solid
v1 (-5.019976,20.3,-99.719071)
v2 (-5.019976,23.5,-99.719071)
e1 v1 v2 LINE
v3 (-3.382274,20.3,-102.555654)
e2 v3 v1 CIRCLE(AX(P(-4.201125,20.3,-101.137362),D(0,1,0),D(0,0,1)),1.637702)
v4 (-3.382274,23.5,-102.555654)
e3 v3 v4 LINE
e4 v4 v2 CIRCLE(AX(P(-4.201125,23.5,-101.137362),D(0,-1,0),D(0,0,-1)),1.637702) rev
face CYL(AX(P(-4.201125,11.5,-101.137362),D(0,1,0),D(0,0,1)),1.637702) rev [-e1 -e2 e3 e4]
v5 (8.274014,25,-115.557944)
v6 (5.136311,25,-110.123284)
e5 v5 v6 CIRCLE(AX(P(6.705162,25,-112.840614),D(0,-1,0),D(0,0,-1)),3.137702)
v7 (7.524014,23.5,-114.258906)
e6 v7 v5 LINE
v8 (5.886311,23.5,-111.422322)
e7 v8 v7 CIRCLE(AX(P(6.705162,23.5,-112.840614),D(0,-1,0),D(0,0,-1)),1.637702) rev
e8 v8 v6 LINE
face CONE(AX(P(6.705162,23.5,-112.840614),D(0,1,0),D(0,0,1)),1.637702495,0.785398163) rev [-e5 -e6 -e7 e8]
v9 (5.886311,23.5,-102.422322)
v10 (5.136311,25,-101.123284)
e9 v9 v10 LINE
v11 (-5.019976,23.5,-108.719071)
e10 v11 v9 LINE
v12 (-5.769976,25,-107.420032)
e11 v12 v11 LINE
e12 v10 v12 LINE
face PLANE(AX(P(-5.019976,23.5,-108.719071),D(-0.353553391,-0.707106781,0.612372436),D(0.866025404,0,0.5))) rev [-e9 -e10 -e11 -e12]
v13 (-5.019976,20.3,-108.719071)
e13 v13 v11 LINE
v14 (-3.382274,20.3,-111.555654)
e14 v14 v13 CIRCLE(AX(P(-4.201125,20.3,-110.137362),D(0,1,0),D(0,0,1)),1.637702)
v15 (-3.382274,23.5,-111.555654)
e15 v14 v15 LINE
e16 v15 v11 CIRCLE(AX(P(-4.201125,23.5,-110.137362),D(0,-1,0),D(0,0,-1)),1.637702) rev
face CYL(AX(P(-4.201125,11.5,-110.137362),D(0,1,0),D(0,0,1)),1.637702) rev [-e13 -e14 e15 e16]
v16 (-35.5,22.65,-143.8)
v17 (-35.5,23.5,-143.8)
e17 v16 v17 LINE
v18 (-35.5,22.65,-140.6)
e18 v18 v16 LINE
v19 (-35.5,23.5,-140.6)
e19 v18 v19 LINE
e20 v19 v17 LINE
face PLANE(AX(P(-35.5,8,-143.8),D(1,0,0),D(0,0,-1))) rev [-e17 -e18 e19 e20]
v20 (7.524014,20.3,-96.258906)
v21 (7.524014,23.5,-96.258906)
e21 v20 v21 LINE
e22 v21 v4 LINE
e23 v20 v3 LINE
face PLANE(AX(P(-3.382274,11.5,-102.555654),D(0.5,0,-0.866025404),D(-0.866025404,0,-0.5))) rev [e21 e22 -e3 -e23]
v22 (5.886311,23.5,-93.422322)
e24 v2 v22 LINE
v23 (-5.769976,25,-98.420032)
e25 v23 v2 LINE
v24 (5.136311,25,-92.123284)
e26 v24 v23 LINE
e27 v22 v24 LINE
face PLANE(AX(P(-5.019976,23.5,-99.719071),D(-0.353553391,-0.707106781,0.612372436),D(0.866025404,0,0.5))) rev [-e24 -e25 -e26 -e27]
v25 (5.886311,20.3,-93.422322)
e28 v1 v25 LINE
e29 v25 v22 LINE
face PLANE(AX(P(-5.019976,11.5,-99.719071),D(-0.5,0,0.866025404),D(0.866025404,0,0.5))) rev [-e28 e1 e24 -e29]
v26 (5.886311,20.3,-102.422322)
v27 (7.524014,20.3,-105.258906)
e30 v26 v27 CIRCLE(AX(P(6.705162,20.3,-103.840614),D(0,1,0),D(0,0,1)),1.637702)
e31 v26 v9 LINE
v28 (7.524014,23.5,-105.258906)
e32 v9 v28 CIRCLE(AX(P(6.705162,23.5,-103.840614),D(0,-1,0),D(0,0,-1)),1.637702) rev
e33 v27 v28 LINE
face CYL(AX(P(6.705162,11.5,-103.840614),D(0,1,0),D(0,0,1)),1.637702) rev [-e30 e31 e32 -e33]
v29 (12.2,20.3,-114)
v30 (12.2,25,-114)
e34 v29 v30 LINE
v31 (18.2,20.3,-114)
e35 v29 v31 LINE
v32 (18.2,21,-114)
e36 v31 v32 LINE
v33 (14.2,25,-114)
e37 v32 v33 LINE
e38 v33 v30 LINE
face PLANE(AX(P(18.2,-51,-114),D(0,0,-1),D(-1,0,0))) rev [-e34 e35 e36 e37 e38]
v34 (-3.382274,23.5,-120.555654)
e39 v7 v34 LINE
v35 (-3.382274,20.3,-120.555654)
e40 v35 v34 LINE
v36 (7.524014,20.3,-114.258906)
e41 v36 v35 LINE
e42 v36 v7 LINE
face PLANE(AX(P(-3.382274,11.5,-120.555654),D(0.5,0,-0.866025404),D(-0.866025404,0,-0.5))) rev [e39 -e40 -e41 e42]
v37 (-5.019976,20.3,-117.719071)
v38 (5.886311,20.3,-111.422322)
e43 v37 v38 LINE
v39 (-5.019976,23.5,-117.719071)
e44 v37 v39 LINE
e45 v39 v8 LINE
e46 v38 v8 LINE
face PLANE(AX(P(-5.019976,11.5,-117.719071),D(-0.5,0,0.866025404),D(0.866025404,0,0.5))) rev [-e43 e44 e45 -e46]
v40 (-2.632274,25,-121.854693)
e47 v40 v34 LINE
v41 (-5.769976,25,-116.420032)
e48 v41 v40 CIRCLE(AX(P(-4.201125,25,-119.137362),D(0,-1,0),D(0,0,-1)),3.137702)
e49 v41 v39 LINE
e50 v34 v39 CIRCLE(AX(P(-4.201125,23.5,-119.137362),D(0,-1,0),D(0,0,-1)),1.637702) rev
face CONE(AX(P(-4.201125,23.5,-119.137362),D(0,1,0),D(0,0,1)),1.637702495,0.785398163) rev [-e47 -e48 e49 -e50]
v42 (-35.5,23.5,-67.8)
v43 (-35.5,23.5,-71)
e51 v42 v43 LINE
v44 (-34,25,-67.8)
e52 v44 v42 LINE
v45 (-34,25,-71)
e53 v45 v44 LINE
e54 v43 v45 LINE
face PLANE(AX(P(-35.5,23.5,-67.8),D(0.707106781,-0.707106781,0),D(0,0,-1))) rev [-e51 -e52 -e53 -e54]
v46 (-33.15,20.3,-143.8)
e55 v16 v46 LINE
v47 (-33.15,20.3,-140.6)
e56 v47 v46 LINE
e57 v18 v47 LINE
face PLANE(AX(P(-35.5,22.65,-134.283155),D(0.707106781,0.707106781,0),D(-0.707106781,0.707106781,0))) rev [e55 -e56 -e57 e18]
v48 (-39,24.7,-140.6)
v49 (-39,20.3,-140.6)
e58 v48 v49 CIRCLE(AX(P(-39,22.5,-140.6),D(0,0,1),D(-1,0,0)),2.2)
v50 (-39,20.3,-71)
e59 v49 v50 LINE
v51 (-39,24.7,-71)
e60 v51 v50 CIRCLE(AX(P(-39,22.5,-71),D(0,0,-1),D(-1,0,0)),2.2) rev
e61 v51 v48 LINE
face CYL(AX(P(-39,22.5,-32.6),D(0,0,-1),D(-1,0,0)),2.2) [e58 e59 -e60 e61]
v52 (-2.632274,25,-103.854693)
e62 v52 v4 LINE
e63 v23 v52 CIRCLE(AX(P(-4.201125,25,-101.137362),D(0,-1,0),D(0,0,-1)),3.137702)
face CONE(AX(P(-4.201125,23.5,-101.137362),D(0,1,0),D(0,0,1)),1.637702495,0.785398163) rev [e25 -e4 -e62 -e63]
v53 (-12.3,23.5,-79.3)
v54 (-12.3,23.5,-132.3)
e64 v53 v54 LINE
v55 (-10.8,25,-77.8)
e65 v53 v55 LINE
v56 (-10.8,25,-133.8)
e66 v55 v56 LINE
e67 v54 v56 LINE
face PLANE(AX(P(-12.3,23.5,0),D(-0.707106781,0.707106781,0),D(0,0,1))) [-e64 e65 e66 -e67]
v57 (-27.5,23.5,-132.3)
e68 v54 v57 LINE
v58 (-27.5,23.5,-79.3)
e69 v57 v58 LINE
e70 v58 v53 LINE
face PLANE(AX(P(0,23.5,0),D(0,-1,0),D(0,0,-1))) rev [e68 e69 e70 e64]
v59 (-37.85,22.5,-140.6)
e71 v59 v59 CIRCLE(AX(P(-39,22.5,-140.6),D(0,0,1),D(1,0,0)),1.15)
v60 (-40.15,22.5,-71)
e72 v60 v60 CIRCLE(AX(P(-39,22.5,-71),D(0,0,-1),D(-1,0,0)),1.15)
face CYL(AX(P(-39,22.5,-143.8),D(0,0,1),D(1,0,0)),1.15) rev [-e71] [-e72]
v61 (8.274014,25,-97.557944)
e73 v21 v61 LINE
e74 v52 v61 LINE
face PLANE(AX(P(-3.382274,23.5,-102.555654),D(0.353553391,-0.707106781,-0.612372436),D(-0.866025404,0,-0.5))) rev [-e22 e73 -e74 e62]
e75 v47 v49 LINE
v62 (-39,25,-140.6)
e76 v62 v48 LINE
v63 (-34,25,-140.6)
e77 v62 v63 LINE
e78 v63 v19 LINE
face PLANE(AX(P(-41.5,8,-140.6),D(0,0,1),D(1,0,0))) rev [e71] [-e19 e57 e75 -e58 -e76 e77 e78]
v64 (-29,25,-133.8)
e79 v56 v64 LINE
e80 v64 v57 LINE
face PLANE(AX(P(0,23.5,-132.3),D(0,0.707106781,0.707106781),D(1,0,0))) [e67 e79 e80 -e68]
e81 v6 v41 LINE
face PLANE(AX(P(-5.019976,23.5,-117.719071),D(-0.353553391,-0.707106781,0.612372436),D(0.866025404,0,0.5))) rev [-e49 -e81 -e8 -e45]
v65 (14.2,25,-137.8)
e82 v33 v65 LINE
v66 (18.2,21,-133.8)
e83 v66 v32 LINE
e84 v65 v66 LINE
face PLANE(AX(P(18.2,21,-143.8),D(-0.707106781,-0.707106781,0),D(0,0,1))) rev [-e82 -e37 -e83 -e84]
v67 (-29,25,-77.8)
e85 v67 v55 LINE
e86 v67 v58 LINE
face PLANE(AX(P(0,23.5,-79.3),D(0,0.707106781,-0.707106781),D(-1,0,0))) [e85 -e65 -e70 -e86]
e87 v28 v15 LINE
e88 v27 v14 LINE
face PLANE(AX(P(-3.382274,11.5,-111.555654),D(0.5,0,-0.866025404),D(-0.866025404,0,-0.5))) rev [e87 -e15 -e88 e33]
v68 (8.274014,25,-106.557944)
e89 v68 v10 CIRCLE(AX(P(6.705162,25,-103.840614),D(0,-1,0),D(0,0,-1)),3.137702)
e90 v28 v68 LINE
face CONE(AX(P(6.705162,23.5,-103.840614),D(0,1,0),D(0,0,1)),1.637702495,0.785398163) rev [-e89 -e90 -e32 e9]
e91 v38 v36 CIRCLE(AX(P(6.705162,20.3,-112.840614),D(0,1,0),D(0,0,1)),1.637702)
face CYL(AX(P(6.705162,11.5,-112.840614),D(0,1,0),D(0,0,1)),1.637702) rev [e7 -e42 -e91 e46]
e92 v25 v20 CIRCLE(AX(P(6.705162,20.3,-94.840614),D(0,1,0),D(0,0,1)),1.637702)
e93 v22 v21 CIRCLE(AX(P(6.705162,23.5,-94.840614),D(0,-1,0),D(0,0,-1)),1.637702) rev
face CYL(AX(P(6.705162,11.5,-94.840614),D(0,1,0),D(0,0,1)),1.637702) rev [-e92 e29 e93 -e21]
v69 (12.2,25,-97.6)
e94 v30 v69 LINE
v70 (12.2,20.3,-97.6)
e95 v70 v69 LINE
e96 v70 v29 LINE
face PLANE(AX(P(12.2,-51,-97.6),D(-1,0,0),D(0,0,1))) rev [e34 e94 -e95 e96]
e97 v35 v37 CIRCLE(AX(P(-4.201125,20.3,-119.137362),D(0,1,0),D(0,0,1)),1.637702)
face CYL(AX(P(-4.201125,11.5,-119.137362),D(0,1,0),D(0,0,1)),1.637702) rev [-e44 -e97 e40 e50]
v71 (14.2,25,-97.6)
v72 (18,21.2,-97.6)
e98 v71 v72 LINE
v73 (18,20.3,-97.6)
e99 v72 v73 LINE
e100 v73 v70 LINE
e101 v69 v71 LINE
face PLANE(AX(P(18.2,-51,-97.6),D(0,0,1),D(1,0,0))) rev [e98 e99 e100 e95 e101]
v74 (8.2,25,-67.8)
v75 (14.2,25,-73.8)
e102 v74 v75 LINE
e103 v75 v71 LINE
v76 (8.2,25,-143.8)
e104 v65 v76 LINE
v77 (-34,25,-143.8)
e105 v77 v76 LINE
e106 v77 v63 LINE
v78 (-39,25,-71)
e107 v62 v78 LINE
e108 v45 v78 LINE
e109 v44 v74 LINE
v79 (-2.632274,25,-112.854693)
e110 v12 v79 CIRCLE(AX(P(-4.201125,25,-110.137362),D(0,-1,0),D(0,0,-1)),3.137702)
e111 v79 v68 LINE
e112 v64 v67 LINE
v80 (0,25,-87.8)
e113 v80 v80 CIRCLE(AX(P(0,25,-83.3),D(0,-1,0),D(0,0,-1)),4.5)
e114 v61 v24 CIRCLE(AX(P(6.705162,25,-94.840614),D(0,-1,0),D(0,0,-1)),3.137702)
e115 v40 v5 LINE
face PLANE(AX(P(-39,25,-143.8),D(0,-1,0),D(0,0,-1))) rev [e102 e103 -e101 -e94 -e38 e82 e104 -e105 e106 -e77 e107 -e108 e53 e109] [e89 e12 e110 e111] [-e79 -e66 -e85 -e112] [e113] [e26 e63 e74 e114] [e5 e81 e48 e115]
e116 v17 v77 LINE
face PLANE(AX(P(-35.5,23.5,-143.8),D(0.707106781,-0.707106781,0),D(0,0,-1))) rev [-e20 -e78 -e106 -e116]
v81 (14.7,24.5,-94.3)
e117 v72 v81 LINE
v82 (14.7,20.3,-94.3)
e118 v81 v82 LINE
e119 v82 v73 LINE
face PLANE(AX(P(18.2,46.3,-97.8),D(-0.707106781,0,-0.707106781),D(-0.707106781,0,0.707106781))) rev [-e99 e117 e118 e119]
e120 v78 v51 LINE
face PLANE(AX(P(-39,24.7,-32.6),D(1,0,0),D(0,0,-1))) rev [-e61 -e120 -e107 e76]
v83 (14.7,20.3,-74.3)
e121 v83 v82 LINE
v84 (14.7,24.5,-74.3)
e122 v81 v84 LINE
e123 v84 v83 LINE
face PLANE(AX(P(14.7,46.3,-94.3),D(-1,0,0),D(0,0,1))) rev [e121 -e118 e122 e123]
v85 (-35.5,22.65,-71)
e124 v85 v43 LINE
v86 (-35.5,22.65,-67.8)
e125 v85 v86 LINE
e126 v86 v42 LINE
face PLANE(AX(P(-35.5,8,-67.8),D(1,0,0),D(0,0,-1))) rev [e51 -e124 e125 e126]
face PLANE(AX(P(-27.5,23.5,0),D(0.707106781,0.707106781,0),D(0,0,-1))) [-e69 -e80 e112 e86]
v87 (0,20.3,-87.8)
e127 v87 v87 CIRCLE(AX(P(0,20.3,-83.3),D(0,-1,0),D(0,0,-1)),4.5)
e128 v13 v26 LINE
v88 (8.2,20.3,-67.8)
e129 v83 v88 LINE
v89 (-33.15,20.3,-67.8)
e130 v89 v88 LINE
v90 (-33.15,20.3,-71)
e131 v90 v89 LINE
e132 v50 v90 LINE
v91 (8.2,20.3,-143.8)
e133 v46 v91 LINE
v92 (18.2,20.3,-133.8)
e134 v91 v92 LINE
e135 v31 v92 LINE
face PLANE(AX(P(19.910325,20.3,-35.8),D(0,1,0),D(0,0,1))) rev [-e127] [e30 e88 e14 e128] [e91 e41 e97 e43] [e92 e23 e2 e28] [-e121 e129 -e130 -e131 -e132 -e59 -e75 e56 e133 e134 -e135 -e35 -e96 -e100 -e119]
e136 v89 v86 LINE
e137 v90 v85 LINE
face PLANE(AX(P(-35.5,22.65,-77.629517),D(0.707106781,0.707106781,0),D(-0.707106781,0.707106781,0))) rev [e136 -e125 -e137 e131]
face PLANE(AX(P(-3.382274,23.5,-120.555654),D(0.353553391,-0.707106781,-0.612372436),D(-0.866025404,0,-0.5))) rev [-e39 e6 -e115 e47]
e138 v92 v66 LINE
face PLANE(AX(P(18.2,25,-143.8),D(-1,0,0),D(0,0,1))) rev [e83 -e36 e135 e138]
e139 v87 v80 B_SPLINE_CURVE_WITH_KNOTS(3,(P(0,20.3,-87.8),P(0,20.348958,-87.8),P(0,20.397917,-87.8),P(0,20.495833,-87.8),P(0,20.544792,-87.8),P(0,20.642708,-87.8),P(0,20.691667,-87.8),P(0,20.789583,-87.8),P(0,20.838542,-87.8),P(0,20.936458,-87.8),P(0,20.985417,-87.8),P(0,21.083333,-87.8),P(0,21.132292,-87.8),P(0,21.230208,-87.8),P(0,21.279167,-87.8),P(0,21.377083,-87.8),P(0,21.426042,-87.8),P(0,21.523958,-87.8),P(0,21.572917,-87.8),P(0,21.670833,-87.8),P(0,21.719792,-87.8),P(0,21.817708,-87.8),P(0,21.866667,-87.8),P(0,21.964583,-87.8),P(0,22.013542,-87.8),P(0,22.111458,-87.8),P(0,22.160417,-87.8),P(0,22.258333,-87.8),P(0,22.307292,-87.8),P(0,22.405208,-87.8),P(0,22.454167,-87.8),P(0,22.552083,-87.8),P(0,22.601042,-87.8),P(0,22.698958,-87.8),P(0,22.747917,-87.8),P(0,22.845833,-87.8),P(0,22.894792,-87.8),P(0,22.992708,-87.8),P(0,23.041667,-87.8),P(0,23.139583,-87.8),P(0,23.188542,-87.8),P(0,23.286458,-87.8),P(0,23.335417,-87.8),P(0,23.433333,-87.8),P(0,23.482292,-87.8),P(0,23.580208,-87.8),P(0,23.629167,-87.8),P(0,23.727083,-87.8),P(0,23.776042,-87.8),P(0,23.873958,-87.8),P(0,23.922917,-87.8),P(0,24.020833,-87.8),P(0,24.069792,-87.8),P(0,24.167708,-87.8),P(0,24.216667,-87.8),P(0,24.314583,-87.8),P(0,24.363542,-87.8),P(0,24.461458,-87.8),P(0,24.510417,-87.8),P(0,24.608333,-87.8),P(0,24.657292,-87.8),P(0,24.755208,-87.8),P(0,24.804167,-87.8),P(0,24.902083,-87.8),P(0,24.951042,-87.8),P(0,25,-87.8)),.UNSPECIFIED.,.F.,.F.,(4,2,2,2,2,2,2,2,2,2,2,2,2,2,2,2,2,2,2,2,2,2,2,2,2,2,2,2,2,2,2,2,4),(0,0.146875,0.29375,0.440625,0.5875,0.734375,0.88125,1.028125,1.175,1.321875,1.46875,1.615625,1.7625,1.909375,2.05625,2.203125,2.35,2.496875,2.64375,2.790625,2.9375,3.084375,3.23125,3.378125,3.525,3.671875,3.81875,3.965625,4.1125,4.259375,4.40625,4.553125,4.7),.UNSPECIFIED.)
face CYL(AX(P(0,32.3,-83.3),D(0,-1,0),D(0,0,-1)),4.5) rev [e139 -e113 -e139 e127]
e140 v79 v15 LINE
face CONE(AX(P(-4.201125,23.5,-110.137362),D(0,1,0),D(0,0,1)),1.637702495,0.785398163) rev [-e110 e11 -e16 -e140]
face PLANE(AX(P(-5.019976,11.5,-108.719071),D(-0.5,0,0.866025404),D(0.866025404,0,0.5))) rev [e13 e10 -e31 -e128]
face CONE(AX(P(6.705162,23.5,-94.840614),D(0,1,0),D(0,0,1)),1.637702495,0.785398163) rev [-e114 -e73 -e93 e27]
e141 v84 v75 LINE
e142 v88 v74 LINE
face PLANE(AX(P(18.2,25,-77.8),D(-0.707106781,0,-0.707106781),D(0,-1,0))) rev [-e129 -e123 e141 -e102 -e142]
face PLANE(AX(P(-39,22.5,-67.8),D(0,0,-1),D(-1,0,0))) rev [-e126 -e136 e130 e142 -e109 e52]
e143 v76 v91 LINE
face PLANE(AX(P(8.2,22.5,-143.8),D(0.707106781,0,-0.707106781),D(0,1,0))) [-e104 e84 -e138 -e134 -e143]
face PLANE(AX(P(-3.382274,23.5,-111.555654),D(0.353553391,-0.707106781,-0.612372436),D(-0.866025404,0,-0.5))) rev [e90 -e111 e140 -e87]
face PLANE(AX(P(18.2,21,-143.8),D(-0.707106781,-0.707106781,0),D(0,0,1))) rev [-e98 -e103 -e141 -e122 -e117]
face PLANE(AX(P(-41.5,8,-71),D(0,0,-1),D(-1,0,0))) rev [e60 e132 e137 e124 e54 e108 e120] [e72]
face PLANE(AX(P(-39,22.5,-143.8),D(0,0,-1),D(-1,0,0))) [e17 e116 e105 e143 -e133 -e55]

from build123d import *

# Parameters (mm, degrees)
BOSS_EXTRUDE1_START         = 10
SKETCH1_R                   = 1.15
BOSS_EXTRUDE1_DEPTH         = 76
SKETCH2_W                   = 6
SKETCH2_H                   = 16.4
CUT_EXTRUDE1_DEPTH          = 76
BOSS_EXTRUDE2_START         = -22
BOSS_EXTRUDE2_DEPTH         = 22
BOSS_EXTRUDE2_2_DEPTH       = 2
BOSS_EXTRUDE2_3_OUTLINE_W   = 6
BOSS_EXTRUDE2_3_OUTLINE_H   = 16
BOSS_EXTRUDE2_3_OUTLINE_W_2 = 5
BOSS_EXTRUDE2_3_OUTLINE_H_2 = 3
BOSS_EXTRUDE2_3_DEPTH       = 5
BOSS_EXTRUDE2_START_2       = -51.8
BOSS_EXTRUDE2_4_DEPTH       = 67
BOSS_EXTRUDE2_START_3       = -59
BOSS_EXTRUDE2_5_OUTLINE_R   = 1.15
BOSS_EXTRUDE2_5_DEPTH       = 78
CHAMFER1_SIZE               = 10
CHAMFER2_SIZE               = 4
CHAMFER3_SIZE               = 4
SKETCH4_W                   = 6
SKETCH4_H                   = 3.2
CUT_EXTRUDE2_DEPTH          = 17
CUT_EXTRUDE4_DEPTH          = 30
CUT_EXTRUDE4_DEPTH_BACK     = 41
SKETCH5_W                   = 96.095535807
SKETCH5_H                   = 97.903785136
SKETCH6_W                   = 65.908561939
SKETCH6_H                   = 2.295323053
CUT_EXTRUDE5_DEPTH          = 108
CUT_EXTRUDE6_DEPTH          = 108
SKETCH9_W                   = 18.2
SKETCH9_H                   = 56
CUT_EXTRUDE8_DEPTH          = 1.5
CUT_EXTRUDE9_DEPTH          = 13.5
CHAMFER4_SIZE               = 1.5
CHAMFER5_SIZE               = 1.5
CUT_EXTRUDE10_DEPTH         = 3.2
CUT_EXTRUDE11_DEPTH         = 3.2
CHAMFER6_SIZE               = 1.5
CUT_EXTRUDE12_DEPTH         = 26
SKETCH15_R                  = 4.5
CUT_EXTRUDE13_DEPTH         = 12


with BuildPart() as part:
    # Sketch1 → Boss-Extrude1 (new body)
    with BuildSketch(Plane(origin=(0, 0, -57.8), x_dir=(-1, 0, 0), z_dir=(0, 0, -1)).offset(BOSS_EXTRUDE1_START)):
        with BuildLine():
            Line((39, 25), (-18.2, 25))
            Line((-18.2, 25), (-18.2, 20))
            Line((-18.2, 20), (39, 20))
            ThreePointArc((39, 20), (41.5, 22.5), (39, 25))
        make_face()
        with Locations((39, 22.5)):
            Circle(SKETCH1_R, mode=Mode.SUBTRACT)
    extrude(amount=BOSS_EXTRUDE1_DEPTH)

    # Sketch2 → Cut-Extrude1 (cut)
    with BuildSketch(Plane(origin=(0, 25, 0), x_dir=(1, 0, 0), z_dir=(0, 1, 0))):
        with Locations((15.2, 105.8)):
            Rectangle(SKETCH2_W, SKETCH2_H)
    extrude(amount=-CUT_EXTRUDE1_DEPTH, mode=Mode.SUBTRACT)

    # Chamfer1
    chamfer1_edges = [part.edges().sort_by_distance(p)[0] for p in [
        (18.2, 22.5, -143.8),
        (18.2, 22.5, -67.8),
    ]]
    chamfer(chamfer1_edges, length=CHAMFER1_SIZE)

    # Chamfer2
    chamfer2_edges = [part.edges().sort_by_distance(p)[0] for p in [
        (18.2, 25, -87.7),
        (18.2, 25, -123.9),
    ]]
    chamfer(chamfer2_edges, length=CHAMFER2_SIZE)

    # Sketch4 → Cut-Extrude2 (cut)
    with BuildSketch(Plane(origin=(0, 25, 0), x_dir=(1, 0, 0), z_dir=(0, 1, 0))):
        with Locations((-38.5, 69.4)):
            Rectangle(SKETCH4_W, SKETCH4_H)
        with Locations((-38.5, 142.2)):
            Rectangle(SKETCH4_W, SKETCH4_H)
    extrude(amount=-CUT_EXTRUDE2_DEPTH, mode=Mode.SUBTRACT)

    # Sketch6 → Cut-Extrude5 (cut)
    with BuildSketch(Plane(origin=(0, 0, -143.8), x_dir=(-1, 0, 0), z_dir=(0, 0, -1))):
        with Locations((13.043955502, 19.152338474)):
            Rectangle(SKETCH6_W, SKETCH6_H)
    extrude(amount=-CUT_EXTRUDE5_DEPTH, mode=Mode.SUBTRACT)

    # Sketch7 → Cut-Extrude6 (cut)
    with BuildSketch(Plane(origin=(0, 0, -140.6), x_dir=(-1, 0, 0), z_dir=(0, 0, -1))):
        with BuildLine():
            Line((39, 24.7), (39, 27.795668708))
            Line((39, 27.795668708), (44.096773439, 22.698895269))
            Line((44.096773439, 22.698895269), (43.273657472, 20.3))
            Line((43.273657472, 20.3), (39, 20.3))
            ThreePointArc((39, 20.3), (41.2, 22.5), (39, 24.7))
        make_face()
    extrude(amount=-CUT_EXTRUDE6_DEPTH, mode=Mode.SUBTRACT)

    # Sketch9 → Cut-Extrude8 (cut)
    with BuildSketch(Plane(origin=(0, 25, 0), x_dir=(1, 0, 0), z_dir=(0, 1, 0))):
        with Locations((-19.9, 105.8)):
            Rectangle(SKETCH9_W, SKETCH9_H)
    extrude(amount=-CUT_EXTRUDE8_DEPTH, mode=Mode.SUBTRACT)

    # Sketch11 → Cut-Extrude9 (cut)
    with BuildSketch(Plane(origin=(0, 25, 0), x_dir=(1, 0, 0), z_dir=(0, 1, 0))):
        with BuildLine():
            Line((-3.382273892, 102.55565443), (7.524013646, 96.258906385))
            ThreePointArc((7.524013646, 96.258906385), (8.123454363, 94.021763172), (5.886311151, 93.422322455))
            Line((5.886311151, 93.422322455), (-5.019976387, 99.719070501))
            ThreePointArc((-5.019976387, 99.719070501), (-5.619417104, 101.956213713), (-3.382273892, 102.55565443))
        make_face()
        with BuildLine():
            Line((-3.382273892, 111.55565443), (7.524013646, 105.258906385))
            ThreePointArc((7.524013646, 105.258906385), (8.123454363, 103.021763172), (5.886311151, 102.422322455))
            Line((5.886311151, 102.422322455), (-5.019976387, 108.719070501))
            ThreePointArc((-5.019976387, 108.719070501), (-5.619417104, 110.956213713), (-3.382273892, 111.55565443))
        make_face()
        with BuildLine():
            Line((-3.382273892, 120.55565443), (7.524013646, 114.258906385))
            ThreePointArc((7.524013646, 114.258906385), (8.123454363, 112.021763172), (5.886311151, 111.422322455))
            Line((5.886311151, 111.422322455), (-5.019976387, 117.719070501))
            ThreePointArc((-5.019976387, 117.719070501), (-5.619417104, 119.956213713), (-3.382273892, 120.55565443))
        make_face()
    extrude(amount=-CUT_EXTRUDE9_DEPTH, mode=Mode.SUBTRACT)

    # Chamfer4
    chamfer4_edges = [part.edges().sort_by_distance(p)[0] for p in [
        (-19.9, 23.5, -133.8),
        (-10.8, 23.5, -105.8),
        (-19.9, 23.5, -77.8),
        (-29, 23.5, -105.8),
    ]]
    chamfer(chamfer4_edges, length=CHAMFER4_SIZE - 0.0001)  # a hair under: the kernel refuses the full size

    # Chamfer5
    chamfer5_edges = [part.edges().sort_by_distance(p)[0] for p in [
        (-5.619417104, 25, -110.956213713),
        (0.433167382, 25, -105.570696478),
        (8.123454363, 25, -103.021763172),
        (2.070869877, 25, -108.407280407),
        (-5.619417104, 25, -119.956213713),
        (0.433167382, 25, -114.570696478),
        (8.123454363, 25, -112.021763172),
        (2.070869877, 25, -117.407280407),
        (-5.619417104, 25, -101.956213713),
        (0.433167382, 25, -96.570696478),
        (8.123454363, 25, -94.021763172),
        (2.070869877, 25, -99.407280407),
    ]]
    chamfer(chamfer5_edges, length=CHAMFER5_SIZE)

    # Sketch12 → Cut-Extrude10 (cut)
    with BuildSketch(Plane(origin=(0, 0, -143.8), x_dir=(-1, 0, 0), z_dir=(0, 0, -1))):
        Polygon((35.5, 22.65), (33.15, 20.3), (34.627405096, 18.349875441), (37.777251213, 19.324937721), align=None)
    extrude(amount=-CUT_EXTRUDE10_DEPTH, mode=Mode.SUBTRACT)

    # Sketch13 → Cut-Extrude11 (cut)
    with BuildSketch(Plane.XY.offset(-67.8)):
        Polygon((-35.5, 22.65), (-33.15, 20.3), (-32.556705416, 17.347754732), (-36.536239956, 18.083750154), align=None)
    extrude(amount=-CUT_EXTRUDE11_DEPTH, mode=Mode.SUBTRACT)

    # Chamfer6
    chamfer6_edges = [part.edges().sort_by_distance(p)[0] for p in [
        (-35.5, 25, -69.4),
        (-35.5, 25, -142.2),
    ]]
    chamfer(chamfer6_edges, length=CHAMFER6_SIZE)

    # Sketch14 → Cut-Extrude12 (cut)
    with BuildSketch(Plane.XZ.offset(-20.3)):
        Polygon((18.2, -97.8), (14.7, -94.3), (14.7, -71.715249411), (21.506629366, -77.723703215), (19.139662716, -97.460563588), align=None)
    extrude(amount=-CUT_EXTRUDE12_DEPTH, mode=Mode.SUBTRACT)

    # Sketch15 → Cut-Extrude13 (cut)
    with BuildSketch(Plane.XZ.offset(-20.3)):
        with Locations(Location((0, -83.3, 0), (0, 0, 270))):
            Circle(SKETCH15_R)
    extrude(amount=-CUT_EXTRUDE13_DEPTH, mode=Mode.SUBTRACT)


with BuildPart() as body_2:
    # Boss-Extrude2: read off the stored shape, not the designer's step
    # Boss-Extrude2 outline → Boss-Extrude2 (new body)
    with BuildSketch(Plane(origin=(0, 20, 0), x_dir=(1, 0, 0), z_dir=(0, 1, 0)).offset(BOSS_EXTRUDE2_START)):
        Polygon((18.2, 47.8), (8.2, 57.8), (-41.5, 57.8), (-41.5, -18.2), (8.2, -18.2), (18.2, -8.2), align=None)
        with BuildLine():
            Line((-20, -15.2), (-38.5, -15.2))
            Line((-38.5, -15.2), (-38.5, 54.8))
            Line((-38.5, 54.8), (1.49684114, 54.8))
            Line((1.49684114, 54.8), (1.49684114, 39.499999909))
            Line((1.49684114, 39.499999909), (11.34684114, 39.499999909))
            Line((11.34684114, 39.499999909), (11.34684114, 10.113812147))
            ThreePointArc((11.34684114, 10.113812147), (0.0047491, -15.199999258), (-11.35315886, 10.10671974))
            Line((-11.35315886, 10.10671974), (-11.35315886, 39.499999909))
            Line((-11.35315886, 39.499999909), (-1.50315886, 39.499999909))
            Line((-1.50315886, 39.499999909), (-1.50315886, 51.8))
            Line((-1.50315886, 51.8), (-20, 51.8))
            Line((-20, 51.8), (-20, -15.2))
        make_face(mode=Mode.SUBTRACT)
    extrude(amount=BOSS_EXTRUDE2_DEPTH)

    # Boss-Extrude2 2 outline → Boss-Extrude2 2 (add)
    with BuildSketch(Plane(origin=(0, 20, 0), x_dir=(1, 0, 0), z_dir=(0, 1, 0)).offset(BOSS_EXTRUDE2_START)):
        with BuildLine():
            Line((1.49684114, 54.8), (-38.5, 54.8))
            Line((-38.5, 54.8), (-38.5, -15.2))
            Line((-38.5, -15.2), (-20, -15.2))
            Line((-20, -15.2), (-20, 51.8))
            Line((-20, 51.8), (-1.50315886, 51.8))
            Line((-1.50315886, 51.8), (-1.50315886, 39.499999909))
            Line((-1.50315886, 39.499999909), (-11.35315886, 39.499999909))
            Line((-11.35315886, 39.499999909), (-11.35315886, 10.10671974))
            ThreePointArc((-11.35315886, 10.10671974), (0.0047491, -15.199999258), (11.34684114, 10.113812147))
            Line((11.34684114, 10.113812147), (11.34684114, 39.499999909))
            Line((11.34684114, 39.499999909), (1.49684114, 39.499999909))
            Line((1.49684114, 39.499999909), (1.49684114, 54.8))
        make_face()
    extrude(amount=BOSS_EXTRUDE2_2_DEPTH)

    # Boss-Extrude2 3 outline → Boss-Extrude2 3 (add)
    with BuildSketch(Plane(origin=(0, 20, 0), x_dir=(1, 0, 0), z_dir=(0, 1, 0))):
        with Locations((15.2, 19.8)):
            Rectangle(BOSS_EXTRUDE2_3_OUTLINE_W, BOSS_EXTRUDE2_3_OUTLINE_H)
        with Locations((-39, 56.3)):
            Rectangle(BOSS_EXTRUDE2_3_OUTLINE_W_2, BOSS_EXTRUDE2_3_OUTLINE_H_2)
        with Locations((-39, -16.7)):
            Rectangle(BOSS_EXTRUDE2_3_OUTLINE_W_2, BOSS_EXTRUDE2_3_OUTLINE_H_2)
    extrude(amount=BOSS_EXTRUDE2_3_DEPTH)

    # Boss-Extrude2 4 outline → Boss-Extrude2 4 (cut)
    with BuildSketch(Plane.XY.offset(BOSS_EXTRUDE2_START_2)):
        Polygon((-20, 15.5), (-15.5, 20), (-20, 20), align=None)
    extrude(amount=BOSS_EXTRUDE2_4_DEPTH, mode=Mode.SUBTRACT)

    # Boss-Extrude2 5 outline → Boss-Extrude2 5 (cut)
    with BuildSketch(Plane.XY.offset(BOSS_EXTRUDE2_START_3)):
        with BuildLine():
            ThreePointArc((-41.5, 23), (-40.914213562, 24.414213562), (-39.5, 25))
            Line((-39.5, 25), (-41.5, 25))
            Line((-41.5, 25), (-41.5, 23))
        make_face()
        with BuildLine():
            ThreePointArc((-38.5, 25), (-37.085786438, 24.414213562), (-36.5, 23))
            Line((-36.5, 23), (-36.5, 25))
            Line((-36.5, 25), (-38.5, 25))
        make_face()
        with Locations((-39, 22.5)):
            Circle(BOSS_EXTRUDE2_5_OUTLINE_R)
    extrude(amount=BOSS_EXTRUDE2_5_DEPTH, mode=Mode.SUBTRACT)

    # Chamfer3
    chamfer3_edges = [body_2.edges().sort_by_distance(p)[0] for p in [
        (18.2, 25, -19.8),
    ]]
    chamfer(chamfer3_edges, length=CHAMFER3_SIZE)

    # Sketch5 → Cut-Extrude4 (cut, two sides: drawn at the far end of the back side and taken through both)
    with BuildSketch(Plane(origin=(0, 25, 0), x_dir=(1, 0, 0), z_dir=(0, 1, 0)).offset(-CUT_EXTRUDE4_DEPTH_BACK)):
        with Locations((-8.937626006, 13.848107432)):
            Rectangle(SKETCH5_W, SKETCH5_H)
    extrude(amount=CUT_EXTRUDE4_DEPTH + CUT_EXTRUDE4_DEPTH_BACK, mode=Mode.SUBTRACT)


solid = part.part
